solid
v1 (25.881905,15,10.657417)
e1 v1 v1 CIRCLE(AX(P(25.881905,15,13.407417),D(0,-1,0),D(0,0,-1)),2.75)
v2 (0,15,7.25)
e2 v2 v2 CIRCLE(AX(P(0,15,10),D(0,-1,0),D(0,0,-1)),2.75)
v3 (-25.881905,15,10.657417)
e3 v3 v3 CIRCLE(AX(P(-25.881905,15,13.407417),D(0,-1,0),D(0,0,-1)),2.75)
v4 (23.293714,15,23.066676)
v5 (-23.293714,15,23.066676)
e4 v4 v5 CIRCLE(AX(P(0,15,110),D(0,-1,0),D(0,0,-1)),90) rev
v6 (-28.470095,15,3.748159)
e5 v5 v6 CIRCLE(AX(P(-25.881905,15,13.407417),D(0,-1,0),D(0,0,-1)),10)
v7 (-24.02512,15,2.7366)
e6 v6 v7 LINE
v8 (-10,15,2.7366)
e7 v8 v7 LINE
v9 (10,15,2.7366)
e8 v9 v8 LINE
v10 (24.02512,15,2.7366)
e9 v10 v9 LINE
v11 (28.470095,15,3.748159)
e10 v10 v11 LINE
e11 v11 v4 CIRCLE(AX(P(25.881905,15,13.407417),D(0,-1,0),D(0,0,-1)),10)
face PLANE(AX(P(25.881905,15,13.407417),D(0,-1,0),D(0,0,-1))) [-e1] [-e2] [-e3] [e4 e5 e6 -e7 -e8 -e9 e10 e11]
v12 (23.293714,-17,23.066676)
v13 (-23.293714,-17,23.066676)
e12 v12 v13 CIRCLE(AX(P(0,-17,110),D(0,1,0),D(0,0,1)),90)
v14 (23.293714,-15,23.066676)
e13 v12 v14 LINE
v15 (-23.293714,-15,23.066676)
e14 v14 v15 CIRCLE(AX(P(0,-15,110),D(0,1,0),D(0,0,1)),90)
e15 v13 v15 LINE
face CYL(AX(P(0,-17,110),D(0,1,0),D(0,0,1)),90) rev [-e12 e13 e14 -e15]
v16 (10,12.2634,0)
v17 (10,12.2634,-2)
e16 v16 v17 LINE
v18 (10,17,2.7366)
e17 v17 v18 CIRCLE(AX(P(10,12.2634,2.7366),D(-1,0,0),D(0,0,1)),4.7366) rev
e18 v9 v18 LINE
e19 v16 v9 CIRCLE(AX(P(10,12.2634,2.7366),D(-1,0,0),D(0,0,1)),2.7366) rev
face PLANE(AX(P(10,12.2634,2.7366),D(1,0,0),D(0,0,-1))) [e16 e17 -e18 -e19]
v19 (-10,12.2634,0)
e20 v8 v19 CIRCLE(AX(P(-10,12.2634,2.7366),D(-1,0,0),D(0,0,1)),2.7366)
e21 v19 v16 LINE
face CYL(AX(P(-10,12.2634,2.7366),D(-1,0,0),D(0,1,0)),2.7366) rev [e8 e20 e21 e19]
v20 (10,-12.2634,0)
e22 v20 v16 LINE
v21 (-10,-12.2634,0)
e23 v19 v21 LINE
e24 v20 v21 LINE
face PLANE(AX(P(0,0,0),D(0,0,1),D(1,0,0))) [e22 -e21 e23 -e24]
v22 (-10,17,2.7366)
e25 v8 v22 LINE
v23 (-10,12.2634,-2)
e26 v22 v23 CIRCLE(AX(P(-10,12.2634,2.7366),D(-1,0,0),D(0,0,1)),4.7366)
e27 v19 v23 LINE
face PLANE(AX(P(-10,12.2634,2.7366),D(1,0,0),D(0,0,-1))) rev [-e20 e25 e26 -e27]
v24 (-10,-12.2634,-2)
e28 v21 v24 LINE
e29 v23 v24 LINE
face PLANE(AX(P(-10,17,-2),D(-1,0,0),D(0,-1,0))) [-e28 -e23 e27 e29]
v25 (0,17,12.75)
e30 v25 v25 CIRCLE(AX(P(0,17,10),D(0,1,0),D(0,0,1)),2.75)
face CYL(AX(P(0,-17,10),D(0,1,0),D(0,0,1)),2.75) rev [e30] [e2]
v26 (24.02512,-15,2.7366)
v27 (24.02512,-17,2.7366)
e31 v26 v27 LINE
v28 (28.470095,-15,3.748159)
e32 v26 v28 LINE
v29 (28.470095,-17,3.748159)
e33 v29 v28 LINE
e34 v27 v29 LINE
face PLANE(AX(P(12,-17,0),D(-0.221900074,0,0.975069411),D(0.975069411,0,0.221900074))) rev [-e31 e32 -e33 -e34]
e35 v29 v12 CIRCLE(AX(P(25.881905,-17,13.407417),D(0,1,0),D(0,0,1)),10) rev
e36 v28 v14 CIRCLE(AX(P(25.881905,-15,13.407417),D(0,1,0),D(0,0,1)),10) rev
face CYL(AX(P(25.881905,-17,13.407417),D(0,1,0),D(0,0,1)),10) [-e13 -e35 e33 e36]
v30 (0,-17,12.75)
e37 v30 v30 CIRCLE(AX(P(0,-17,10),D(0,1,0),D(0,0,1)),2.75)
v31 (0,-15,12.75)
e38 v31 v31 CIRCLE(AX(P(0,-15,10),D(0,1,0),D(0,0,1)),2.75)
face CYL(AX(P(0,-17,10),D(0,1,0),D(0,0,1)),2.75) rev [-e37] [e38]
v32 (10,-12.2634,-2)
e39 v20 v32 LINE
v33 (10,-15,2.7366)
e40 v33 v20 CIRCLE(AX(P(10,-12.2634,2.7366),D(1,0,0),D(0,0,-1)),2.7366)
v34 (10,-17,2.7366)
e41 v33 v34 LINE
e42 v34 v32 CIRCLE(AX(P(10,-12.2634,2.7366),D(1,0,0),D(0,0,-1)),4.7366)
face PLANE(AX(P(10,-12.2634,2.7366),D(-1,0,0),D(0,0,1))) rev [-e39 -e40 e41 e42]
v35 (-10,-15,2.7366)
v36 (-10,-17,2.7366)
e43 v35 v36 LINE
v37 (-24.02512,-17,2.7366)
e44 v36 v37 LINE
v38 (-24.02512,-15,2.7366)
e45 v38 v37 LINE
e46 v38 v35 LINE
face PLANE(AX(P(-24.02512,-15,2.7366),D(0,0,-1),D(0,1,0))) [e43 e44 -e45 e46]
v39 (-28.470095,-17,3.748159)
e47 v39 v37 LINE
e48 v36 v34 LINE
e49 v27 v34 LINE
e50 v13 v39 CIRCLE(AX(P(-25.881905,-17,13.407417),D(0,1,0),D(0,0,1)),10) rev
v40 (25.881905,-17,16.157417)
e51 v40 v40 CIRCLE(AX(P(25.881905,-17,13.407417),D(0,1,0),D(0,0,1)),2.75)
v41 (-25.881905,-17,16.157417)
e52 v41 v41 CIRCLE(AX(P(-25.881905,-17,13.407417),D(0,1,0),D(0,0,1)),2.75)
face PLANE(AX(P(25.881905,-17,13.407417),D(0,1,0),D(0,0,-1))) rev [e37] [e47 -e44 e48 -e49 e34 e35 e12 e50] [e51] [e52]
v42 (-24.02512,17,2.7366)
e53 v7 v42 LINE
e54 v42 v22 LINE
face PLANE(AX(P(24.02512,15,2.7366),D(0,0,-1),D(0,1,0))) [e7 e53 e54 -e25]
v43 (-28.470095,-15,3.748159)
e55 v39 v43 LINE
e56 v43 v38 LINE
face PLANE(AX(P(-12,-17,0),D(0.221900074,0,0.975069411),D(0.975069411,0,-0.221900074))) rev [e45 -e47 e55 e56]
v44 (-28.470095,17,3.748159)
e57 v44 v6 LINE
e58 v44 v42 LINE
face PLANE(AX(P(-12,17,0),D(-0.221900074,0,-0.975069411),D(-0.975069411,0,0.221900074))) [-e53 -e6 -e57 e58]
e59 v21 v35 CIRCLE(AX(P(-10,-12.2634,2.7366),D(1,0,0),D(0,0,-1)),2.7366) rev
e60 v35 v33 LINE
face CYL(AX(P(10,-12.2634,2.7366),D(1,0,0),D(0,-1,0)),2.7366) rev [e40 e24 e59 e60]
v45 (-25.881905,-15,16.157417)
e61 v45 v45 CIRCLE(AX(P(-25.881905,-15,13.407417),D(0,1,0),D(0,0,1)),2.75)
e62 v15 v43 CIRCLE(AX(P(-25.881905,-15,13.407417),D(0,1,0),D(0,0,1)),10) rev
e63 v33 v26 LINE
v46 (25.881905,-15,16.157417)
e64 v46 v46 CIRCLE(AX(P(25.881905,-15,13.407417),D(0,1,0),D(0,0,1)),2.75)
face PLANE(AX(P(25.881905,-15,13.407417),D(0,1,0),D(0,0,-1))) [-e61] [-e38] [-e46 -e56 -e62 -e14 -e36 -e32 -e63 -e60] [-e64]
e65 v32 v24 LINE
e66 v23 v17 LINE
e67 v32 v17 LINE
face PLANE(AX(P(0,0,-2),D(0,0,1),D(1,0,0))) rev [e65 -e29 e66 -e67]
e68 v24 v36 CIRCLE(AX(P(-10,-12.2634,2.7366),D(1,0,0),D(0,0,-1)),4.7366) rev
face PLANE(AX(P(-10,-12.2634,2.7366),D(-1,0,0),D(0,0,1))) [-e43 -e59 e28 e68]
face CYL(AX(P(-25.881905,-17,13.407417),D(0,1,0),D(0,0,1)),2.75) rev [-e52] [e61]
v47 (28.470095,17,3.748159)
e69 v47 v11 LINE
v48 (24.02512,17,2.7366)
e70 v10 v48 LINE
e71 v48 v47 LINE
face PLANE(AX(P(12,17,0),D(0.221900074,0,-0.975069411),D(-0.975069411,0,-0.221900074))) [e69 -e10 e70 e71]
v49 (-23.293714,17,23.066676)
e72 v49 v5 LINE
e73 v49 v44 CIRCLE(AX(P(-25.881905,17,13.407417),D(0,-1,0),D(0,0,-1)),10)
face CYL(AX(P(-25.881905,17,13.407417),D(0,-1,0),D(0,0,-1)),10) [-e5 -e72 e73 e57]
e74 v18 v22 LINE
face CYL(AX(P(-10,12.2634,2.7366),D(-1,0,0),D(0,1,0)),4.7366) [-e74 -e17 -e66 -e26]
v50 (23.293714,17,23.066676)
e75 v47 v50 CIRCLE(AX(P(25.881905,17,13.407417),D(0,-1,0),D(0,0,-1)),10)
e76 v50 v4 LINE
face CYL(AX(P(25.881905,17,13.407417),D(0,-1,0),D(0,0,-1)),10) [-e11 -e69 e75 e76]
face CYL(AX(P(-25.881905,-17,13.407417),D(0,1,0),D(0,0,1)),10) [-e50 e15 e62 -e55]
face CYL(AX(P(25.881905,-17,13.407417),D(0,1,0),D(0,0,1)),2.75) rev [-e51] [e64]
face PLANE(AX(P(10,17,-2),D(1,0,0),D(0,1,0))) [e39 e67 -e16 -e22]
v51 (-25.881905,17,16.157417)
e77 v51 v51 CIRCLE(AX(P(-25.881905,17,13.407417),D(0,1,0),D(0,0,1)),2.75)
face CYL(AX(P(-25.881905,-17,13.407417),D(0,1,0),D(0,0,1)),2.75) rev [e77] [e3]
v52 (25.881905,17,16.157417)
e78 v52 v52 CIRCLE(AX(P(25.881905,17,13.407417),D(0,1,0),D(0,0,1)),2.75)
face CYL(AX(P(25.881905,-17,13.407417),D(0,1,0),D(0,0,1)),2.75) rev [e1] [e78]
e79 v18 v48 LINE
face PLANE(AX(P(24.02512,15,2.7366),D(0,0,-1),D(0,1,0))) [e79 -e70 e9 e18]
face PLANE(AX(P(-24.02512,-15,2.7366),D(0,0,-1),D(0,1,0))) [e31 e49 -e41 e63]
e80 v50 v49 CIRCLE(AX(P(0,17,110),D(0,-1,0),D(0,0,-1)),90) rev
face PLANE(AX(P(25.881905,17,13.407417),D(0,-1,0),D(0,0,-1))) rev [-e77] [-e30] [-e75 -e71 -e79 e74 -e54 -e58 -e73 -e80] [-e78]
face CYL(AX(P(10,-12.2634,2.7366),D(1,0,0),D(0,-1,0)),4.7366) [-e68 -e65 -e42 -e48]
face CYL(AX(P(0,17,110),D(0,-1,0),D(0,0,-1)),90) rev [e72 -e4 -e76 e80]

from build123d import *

# Parameters (mm, degrees)
SKETCH_1_W                       = 20
SKETCH_1_H                       = 34
SM_BASE_FLANGE_1_DEPTH           = 2
SM_EDGE_FLANGE_1_STRIP_W         = 13.4732
SM_EDGE_FLANGE_1_STRIP_H         = 2
SM_EDGE_FLANGE_1_STRIP_CUT_DEPTH = 20
SM_EDGE_FLANGE_1_DEPTH           = 20
SM_EDGE_FLANGE_1_FLAT_DEPTH      = 2
SKETCH_9_R                       = 2.75
CUT_EXTRUDE_1_DEPTH              = 55.693859429


# Sheet-metal steps are written as plain solids
with BuildPart() as part:
    # Sketch 1 → 基体-法兰1 (new body)
    with BuildSketch(Plane.XY):
        Rectangle(SKETCH_1_W, SKETCH_1_H)
    extrude(amount=-SM_BASE_FLANGE_1_DEPTH)

    # 边线-法兰1 strip (across the edge) → 边线-法兰1 strip cut (cut)
    with BuildSketch(Plane(origin=(10, 17, 0), x_dir=(0, -1, 0), z_dir=(-1, 0, 0))):
        with Locations((-2, -1)):
            Rectangle(SM_EDGE_FLANGE_1_STRIP_W, SM_EDGE_FLANGE_1_STRIP_H)
    sm_edge_flange_1_strip_cut = extrude(amount=SM_EDGE_FLANGE_1_STRIP_CUT_DEPTH, mode=Mode.SUBTRACT)

    # 边线-法兰1 bend section (across the edge) → 边线-法兰1 (add)
    with BuildSketch(Plane(origin=(10, 17, 0), x_dir=(0, -1, 0), z_dir=(-1, 0, 0))):
        with BuildLine():
            Line((0, 2.7366), (2, 2.7366))
            ThreePointArc((2, 2.7366), (2.801531583, 0.801531583), (4.7366, 0))
            Line((4.7366, 0), (4.7366, -2))
            ThreePointArc((4.7366, -2), (1.38731802, -0.61268198), (0, 2.7366))
        make_face()
    sm_edge_flange_1 = extrude(amount=SM_EDGE_FLANGE_1_DEPTH)

    # 边线-法兰1 profile (on flange) → 边线-法兰1 flat (add)
    with BuildSketch(Plane.XZ.offset(-17)):
        with BuildLine():
            ThreePointArc((23.293714059, 23.066675634), (0, 20), (-23.293714059, 23.066675634))
            ThreePointArc((-23.293714059, 23.066675634), (-35.541162773, 15.995607822), (-28.470094961, 3.748159108))
            Line((-28.470094961, 3.748159108), (-24.025119684, 2.7366))
            Line((-24.025119684, 2.7366), (24.025119684, 2.7366))
            Line((24.025119684, 2.7366), (28.470094961, 3.748159108))
            ThreePointArc((28.470094961, 3.748159108), (35.541162773, 15.995607822), (23.293714059, 23.066675634))
        make_face()
    sm_edge_flange_1_flat = extrude(amount=SM_EDGE_FLANGE_1_FLAT_DEPTH)

    # 镜向1: 边线-法兰1 strip cut, 边线-法兰1, 边线-法兰1 flat across plane
    add(sm_edge_flange_1_strip_cut.mirror(Plane.ZX), mode=Mode.SUBTRACT)
    add(sm_edge_flange_1.mirror(Plane.ZX))
    add(sm_edge_flange_1_flat.mirror(Plane.ZX))

    # 草图9 → 切除-拉伸1 (cut, through all)
    with BuildSketch(Plane(origin=(0, 17, 0), x_dir=(1, 0, 0), z_dir=(0, 1, 0))):
        with Locations(Location((0, -10, 0), (0, 0, 270))):
            Circle(SKETCH_9_R)
        with Locations(Location((25.88190451, -13.407417371, 0), (0, 0, 270))):
            Circle(SKETCH_9_R)
        with Locations(Location((-25.88190451, -13.407417371, 0), (0, 0, 270))):
            Circle(SKETCH_9_R)
    extrude(amount=-CUT_EXTRUDE_1_DEPTH, mode=Mode.SUBTRACT)


solid = part.part
